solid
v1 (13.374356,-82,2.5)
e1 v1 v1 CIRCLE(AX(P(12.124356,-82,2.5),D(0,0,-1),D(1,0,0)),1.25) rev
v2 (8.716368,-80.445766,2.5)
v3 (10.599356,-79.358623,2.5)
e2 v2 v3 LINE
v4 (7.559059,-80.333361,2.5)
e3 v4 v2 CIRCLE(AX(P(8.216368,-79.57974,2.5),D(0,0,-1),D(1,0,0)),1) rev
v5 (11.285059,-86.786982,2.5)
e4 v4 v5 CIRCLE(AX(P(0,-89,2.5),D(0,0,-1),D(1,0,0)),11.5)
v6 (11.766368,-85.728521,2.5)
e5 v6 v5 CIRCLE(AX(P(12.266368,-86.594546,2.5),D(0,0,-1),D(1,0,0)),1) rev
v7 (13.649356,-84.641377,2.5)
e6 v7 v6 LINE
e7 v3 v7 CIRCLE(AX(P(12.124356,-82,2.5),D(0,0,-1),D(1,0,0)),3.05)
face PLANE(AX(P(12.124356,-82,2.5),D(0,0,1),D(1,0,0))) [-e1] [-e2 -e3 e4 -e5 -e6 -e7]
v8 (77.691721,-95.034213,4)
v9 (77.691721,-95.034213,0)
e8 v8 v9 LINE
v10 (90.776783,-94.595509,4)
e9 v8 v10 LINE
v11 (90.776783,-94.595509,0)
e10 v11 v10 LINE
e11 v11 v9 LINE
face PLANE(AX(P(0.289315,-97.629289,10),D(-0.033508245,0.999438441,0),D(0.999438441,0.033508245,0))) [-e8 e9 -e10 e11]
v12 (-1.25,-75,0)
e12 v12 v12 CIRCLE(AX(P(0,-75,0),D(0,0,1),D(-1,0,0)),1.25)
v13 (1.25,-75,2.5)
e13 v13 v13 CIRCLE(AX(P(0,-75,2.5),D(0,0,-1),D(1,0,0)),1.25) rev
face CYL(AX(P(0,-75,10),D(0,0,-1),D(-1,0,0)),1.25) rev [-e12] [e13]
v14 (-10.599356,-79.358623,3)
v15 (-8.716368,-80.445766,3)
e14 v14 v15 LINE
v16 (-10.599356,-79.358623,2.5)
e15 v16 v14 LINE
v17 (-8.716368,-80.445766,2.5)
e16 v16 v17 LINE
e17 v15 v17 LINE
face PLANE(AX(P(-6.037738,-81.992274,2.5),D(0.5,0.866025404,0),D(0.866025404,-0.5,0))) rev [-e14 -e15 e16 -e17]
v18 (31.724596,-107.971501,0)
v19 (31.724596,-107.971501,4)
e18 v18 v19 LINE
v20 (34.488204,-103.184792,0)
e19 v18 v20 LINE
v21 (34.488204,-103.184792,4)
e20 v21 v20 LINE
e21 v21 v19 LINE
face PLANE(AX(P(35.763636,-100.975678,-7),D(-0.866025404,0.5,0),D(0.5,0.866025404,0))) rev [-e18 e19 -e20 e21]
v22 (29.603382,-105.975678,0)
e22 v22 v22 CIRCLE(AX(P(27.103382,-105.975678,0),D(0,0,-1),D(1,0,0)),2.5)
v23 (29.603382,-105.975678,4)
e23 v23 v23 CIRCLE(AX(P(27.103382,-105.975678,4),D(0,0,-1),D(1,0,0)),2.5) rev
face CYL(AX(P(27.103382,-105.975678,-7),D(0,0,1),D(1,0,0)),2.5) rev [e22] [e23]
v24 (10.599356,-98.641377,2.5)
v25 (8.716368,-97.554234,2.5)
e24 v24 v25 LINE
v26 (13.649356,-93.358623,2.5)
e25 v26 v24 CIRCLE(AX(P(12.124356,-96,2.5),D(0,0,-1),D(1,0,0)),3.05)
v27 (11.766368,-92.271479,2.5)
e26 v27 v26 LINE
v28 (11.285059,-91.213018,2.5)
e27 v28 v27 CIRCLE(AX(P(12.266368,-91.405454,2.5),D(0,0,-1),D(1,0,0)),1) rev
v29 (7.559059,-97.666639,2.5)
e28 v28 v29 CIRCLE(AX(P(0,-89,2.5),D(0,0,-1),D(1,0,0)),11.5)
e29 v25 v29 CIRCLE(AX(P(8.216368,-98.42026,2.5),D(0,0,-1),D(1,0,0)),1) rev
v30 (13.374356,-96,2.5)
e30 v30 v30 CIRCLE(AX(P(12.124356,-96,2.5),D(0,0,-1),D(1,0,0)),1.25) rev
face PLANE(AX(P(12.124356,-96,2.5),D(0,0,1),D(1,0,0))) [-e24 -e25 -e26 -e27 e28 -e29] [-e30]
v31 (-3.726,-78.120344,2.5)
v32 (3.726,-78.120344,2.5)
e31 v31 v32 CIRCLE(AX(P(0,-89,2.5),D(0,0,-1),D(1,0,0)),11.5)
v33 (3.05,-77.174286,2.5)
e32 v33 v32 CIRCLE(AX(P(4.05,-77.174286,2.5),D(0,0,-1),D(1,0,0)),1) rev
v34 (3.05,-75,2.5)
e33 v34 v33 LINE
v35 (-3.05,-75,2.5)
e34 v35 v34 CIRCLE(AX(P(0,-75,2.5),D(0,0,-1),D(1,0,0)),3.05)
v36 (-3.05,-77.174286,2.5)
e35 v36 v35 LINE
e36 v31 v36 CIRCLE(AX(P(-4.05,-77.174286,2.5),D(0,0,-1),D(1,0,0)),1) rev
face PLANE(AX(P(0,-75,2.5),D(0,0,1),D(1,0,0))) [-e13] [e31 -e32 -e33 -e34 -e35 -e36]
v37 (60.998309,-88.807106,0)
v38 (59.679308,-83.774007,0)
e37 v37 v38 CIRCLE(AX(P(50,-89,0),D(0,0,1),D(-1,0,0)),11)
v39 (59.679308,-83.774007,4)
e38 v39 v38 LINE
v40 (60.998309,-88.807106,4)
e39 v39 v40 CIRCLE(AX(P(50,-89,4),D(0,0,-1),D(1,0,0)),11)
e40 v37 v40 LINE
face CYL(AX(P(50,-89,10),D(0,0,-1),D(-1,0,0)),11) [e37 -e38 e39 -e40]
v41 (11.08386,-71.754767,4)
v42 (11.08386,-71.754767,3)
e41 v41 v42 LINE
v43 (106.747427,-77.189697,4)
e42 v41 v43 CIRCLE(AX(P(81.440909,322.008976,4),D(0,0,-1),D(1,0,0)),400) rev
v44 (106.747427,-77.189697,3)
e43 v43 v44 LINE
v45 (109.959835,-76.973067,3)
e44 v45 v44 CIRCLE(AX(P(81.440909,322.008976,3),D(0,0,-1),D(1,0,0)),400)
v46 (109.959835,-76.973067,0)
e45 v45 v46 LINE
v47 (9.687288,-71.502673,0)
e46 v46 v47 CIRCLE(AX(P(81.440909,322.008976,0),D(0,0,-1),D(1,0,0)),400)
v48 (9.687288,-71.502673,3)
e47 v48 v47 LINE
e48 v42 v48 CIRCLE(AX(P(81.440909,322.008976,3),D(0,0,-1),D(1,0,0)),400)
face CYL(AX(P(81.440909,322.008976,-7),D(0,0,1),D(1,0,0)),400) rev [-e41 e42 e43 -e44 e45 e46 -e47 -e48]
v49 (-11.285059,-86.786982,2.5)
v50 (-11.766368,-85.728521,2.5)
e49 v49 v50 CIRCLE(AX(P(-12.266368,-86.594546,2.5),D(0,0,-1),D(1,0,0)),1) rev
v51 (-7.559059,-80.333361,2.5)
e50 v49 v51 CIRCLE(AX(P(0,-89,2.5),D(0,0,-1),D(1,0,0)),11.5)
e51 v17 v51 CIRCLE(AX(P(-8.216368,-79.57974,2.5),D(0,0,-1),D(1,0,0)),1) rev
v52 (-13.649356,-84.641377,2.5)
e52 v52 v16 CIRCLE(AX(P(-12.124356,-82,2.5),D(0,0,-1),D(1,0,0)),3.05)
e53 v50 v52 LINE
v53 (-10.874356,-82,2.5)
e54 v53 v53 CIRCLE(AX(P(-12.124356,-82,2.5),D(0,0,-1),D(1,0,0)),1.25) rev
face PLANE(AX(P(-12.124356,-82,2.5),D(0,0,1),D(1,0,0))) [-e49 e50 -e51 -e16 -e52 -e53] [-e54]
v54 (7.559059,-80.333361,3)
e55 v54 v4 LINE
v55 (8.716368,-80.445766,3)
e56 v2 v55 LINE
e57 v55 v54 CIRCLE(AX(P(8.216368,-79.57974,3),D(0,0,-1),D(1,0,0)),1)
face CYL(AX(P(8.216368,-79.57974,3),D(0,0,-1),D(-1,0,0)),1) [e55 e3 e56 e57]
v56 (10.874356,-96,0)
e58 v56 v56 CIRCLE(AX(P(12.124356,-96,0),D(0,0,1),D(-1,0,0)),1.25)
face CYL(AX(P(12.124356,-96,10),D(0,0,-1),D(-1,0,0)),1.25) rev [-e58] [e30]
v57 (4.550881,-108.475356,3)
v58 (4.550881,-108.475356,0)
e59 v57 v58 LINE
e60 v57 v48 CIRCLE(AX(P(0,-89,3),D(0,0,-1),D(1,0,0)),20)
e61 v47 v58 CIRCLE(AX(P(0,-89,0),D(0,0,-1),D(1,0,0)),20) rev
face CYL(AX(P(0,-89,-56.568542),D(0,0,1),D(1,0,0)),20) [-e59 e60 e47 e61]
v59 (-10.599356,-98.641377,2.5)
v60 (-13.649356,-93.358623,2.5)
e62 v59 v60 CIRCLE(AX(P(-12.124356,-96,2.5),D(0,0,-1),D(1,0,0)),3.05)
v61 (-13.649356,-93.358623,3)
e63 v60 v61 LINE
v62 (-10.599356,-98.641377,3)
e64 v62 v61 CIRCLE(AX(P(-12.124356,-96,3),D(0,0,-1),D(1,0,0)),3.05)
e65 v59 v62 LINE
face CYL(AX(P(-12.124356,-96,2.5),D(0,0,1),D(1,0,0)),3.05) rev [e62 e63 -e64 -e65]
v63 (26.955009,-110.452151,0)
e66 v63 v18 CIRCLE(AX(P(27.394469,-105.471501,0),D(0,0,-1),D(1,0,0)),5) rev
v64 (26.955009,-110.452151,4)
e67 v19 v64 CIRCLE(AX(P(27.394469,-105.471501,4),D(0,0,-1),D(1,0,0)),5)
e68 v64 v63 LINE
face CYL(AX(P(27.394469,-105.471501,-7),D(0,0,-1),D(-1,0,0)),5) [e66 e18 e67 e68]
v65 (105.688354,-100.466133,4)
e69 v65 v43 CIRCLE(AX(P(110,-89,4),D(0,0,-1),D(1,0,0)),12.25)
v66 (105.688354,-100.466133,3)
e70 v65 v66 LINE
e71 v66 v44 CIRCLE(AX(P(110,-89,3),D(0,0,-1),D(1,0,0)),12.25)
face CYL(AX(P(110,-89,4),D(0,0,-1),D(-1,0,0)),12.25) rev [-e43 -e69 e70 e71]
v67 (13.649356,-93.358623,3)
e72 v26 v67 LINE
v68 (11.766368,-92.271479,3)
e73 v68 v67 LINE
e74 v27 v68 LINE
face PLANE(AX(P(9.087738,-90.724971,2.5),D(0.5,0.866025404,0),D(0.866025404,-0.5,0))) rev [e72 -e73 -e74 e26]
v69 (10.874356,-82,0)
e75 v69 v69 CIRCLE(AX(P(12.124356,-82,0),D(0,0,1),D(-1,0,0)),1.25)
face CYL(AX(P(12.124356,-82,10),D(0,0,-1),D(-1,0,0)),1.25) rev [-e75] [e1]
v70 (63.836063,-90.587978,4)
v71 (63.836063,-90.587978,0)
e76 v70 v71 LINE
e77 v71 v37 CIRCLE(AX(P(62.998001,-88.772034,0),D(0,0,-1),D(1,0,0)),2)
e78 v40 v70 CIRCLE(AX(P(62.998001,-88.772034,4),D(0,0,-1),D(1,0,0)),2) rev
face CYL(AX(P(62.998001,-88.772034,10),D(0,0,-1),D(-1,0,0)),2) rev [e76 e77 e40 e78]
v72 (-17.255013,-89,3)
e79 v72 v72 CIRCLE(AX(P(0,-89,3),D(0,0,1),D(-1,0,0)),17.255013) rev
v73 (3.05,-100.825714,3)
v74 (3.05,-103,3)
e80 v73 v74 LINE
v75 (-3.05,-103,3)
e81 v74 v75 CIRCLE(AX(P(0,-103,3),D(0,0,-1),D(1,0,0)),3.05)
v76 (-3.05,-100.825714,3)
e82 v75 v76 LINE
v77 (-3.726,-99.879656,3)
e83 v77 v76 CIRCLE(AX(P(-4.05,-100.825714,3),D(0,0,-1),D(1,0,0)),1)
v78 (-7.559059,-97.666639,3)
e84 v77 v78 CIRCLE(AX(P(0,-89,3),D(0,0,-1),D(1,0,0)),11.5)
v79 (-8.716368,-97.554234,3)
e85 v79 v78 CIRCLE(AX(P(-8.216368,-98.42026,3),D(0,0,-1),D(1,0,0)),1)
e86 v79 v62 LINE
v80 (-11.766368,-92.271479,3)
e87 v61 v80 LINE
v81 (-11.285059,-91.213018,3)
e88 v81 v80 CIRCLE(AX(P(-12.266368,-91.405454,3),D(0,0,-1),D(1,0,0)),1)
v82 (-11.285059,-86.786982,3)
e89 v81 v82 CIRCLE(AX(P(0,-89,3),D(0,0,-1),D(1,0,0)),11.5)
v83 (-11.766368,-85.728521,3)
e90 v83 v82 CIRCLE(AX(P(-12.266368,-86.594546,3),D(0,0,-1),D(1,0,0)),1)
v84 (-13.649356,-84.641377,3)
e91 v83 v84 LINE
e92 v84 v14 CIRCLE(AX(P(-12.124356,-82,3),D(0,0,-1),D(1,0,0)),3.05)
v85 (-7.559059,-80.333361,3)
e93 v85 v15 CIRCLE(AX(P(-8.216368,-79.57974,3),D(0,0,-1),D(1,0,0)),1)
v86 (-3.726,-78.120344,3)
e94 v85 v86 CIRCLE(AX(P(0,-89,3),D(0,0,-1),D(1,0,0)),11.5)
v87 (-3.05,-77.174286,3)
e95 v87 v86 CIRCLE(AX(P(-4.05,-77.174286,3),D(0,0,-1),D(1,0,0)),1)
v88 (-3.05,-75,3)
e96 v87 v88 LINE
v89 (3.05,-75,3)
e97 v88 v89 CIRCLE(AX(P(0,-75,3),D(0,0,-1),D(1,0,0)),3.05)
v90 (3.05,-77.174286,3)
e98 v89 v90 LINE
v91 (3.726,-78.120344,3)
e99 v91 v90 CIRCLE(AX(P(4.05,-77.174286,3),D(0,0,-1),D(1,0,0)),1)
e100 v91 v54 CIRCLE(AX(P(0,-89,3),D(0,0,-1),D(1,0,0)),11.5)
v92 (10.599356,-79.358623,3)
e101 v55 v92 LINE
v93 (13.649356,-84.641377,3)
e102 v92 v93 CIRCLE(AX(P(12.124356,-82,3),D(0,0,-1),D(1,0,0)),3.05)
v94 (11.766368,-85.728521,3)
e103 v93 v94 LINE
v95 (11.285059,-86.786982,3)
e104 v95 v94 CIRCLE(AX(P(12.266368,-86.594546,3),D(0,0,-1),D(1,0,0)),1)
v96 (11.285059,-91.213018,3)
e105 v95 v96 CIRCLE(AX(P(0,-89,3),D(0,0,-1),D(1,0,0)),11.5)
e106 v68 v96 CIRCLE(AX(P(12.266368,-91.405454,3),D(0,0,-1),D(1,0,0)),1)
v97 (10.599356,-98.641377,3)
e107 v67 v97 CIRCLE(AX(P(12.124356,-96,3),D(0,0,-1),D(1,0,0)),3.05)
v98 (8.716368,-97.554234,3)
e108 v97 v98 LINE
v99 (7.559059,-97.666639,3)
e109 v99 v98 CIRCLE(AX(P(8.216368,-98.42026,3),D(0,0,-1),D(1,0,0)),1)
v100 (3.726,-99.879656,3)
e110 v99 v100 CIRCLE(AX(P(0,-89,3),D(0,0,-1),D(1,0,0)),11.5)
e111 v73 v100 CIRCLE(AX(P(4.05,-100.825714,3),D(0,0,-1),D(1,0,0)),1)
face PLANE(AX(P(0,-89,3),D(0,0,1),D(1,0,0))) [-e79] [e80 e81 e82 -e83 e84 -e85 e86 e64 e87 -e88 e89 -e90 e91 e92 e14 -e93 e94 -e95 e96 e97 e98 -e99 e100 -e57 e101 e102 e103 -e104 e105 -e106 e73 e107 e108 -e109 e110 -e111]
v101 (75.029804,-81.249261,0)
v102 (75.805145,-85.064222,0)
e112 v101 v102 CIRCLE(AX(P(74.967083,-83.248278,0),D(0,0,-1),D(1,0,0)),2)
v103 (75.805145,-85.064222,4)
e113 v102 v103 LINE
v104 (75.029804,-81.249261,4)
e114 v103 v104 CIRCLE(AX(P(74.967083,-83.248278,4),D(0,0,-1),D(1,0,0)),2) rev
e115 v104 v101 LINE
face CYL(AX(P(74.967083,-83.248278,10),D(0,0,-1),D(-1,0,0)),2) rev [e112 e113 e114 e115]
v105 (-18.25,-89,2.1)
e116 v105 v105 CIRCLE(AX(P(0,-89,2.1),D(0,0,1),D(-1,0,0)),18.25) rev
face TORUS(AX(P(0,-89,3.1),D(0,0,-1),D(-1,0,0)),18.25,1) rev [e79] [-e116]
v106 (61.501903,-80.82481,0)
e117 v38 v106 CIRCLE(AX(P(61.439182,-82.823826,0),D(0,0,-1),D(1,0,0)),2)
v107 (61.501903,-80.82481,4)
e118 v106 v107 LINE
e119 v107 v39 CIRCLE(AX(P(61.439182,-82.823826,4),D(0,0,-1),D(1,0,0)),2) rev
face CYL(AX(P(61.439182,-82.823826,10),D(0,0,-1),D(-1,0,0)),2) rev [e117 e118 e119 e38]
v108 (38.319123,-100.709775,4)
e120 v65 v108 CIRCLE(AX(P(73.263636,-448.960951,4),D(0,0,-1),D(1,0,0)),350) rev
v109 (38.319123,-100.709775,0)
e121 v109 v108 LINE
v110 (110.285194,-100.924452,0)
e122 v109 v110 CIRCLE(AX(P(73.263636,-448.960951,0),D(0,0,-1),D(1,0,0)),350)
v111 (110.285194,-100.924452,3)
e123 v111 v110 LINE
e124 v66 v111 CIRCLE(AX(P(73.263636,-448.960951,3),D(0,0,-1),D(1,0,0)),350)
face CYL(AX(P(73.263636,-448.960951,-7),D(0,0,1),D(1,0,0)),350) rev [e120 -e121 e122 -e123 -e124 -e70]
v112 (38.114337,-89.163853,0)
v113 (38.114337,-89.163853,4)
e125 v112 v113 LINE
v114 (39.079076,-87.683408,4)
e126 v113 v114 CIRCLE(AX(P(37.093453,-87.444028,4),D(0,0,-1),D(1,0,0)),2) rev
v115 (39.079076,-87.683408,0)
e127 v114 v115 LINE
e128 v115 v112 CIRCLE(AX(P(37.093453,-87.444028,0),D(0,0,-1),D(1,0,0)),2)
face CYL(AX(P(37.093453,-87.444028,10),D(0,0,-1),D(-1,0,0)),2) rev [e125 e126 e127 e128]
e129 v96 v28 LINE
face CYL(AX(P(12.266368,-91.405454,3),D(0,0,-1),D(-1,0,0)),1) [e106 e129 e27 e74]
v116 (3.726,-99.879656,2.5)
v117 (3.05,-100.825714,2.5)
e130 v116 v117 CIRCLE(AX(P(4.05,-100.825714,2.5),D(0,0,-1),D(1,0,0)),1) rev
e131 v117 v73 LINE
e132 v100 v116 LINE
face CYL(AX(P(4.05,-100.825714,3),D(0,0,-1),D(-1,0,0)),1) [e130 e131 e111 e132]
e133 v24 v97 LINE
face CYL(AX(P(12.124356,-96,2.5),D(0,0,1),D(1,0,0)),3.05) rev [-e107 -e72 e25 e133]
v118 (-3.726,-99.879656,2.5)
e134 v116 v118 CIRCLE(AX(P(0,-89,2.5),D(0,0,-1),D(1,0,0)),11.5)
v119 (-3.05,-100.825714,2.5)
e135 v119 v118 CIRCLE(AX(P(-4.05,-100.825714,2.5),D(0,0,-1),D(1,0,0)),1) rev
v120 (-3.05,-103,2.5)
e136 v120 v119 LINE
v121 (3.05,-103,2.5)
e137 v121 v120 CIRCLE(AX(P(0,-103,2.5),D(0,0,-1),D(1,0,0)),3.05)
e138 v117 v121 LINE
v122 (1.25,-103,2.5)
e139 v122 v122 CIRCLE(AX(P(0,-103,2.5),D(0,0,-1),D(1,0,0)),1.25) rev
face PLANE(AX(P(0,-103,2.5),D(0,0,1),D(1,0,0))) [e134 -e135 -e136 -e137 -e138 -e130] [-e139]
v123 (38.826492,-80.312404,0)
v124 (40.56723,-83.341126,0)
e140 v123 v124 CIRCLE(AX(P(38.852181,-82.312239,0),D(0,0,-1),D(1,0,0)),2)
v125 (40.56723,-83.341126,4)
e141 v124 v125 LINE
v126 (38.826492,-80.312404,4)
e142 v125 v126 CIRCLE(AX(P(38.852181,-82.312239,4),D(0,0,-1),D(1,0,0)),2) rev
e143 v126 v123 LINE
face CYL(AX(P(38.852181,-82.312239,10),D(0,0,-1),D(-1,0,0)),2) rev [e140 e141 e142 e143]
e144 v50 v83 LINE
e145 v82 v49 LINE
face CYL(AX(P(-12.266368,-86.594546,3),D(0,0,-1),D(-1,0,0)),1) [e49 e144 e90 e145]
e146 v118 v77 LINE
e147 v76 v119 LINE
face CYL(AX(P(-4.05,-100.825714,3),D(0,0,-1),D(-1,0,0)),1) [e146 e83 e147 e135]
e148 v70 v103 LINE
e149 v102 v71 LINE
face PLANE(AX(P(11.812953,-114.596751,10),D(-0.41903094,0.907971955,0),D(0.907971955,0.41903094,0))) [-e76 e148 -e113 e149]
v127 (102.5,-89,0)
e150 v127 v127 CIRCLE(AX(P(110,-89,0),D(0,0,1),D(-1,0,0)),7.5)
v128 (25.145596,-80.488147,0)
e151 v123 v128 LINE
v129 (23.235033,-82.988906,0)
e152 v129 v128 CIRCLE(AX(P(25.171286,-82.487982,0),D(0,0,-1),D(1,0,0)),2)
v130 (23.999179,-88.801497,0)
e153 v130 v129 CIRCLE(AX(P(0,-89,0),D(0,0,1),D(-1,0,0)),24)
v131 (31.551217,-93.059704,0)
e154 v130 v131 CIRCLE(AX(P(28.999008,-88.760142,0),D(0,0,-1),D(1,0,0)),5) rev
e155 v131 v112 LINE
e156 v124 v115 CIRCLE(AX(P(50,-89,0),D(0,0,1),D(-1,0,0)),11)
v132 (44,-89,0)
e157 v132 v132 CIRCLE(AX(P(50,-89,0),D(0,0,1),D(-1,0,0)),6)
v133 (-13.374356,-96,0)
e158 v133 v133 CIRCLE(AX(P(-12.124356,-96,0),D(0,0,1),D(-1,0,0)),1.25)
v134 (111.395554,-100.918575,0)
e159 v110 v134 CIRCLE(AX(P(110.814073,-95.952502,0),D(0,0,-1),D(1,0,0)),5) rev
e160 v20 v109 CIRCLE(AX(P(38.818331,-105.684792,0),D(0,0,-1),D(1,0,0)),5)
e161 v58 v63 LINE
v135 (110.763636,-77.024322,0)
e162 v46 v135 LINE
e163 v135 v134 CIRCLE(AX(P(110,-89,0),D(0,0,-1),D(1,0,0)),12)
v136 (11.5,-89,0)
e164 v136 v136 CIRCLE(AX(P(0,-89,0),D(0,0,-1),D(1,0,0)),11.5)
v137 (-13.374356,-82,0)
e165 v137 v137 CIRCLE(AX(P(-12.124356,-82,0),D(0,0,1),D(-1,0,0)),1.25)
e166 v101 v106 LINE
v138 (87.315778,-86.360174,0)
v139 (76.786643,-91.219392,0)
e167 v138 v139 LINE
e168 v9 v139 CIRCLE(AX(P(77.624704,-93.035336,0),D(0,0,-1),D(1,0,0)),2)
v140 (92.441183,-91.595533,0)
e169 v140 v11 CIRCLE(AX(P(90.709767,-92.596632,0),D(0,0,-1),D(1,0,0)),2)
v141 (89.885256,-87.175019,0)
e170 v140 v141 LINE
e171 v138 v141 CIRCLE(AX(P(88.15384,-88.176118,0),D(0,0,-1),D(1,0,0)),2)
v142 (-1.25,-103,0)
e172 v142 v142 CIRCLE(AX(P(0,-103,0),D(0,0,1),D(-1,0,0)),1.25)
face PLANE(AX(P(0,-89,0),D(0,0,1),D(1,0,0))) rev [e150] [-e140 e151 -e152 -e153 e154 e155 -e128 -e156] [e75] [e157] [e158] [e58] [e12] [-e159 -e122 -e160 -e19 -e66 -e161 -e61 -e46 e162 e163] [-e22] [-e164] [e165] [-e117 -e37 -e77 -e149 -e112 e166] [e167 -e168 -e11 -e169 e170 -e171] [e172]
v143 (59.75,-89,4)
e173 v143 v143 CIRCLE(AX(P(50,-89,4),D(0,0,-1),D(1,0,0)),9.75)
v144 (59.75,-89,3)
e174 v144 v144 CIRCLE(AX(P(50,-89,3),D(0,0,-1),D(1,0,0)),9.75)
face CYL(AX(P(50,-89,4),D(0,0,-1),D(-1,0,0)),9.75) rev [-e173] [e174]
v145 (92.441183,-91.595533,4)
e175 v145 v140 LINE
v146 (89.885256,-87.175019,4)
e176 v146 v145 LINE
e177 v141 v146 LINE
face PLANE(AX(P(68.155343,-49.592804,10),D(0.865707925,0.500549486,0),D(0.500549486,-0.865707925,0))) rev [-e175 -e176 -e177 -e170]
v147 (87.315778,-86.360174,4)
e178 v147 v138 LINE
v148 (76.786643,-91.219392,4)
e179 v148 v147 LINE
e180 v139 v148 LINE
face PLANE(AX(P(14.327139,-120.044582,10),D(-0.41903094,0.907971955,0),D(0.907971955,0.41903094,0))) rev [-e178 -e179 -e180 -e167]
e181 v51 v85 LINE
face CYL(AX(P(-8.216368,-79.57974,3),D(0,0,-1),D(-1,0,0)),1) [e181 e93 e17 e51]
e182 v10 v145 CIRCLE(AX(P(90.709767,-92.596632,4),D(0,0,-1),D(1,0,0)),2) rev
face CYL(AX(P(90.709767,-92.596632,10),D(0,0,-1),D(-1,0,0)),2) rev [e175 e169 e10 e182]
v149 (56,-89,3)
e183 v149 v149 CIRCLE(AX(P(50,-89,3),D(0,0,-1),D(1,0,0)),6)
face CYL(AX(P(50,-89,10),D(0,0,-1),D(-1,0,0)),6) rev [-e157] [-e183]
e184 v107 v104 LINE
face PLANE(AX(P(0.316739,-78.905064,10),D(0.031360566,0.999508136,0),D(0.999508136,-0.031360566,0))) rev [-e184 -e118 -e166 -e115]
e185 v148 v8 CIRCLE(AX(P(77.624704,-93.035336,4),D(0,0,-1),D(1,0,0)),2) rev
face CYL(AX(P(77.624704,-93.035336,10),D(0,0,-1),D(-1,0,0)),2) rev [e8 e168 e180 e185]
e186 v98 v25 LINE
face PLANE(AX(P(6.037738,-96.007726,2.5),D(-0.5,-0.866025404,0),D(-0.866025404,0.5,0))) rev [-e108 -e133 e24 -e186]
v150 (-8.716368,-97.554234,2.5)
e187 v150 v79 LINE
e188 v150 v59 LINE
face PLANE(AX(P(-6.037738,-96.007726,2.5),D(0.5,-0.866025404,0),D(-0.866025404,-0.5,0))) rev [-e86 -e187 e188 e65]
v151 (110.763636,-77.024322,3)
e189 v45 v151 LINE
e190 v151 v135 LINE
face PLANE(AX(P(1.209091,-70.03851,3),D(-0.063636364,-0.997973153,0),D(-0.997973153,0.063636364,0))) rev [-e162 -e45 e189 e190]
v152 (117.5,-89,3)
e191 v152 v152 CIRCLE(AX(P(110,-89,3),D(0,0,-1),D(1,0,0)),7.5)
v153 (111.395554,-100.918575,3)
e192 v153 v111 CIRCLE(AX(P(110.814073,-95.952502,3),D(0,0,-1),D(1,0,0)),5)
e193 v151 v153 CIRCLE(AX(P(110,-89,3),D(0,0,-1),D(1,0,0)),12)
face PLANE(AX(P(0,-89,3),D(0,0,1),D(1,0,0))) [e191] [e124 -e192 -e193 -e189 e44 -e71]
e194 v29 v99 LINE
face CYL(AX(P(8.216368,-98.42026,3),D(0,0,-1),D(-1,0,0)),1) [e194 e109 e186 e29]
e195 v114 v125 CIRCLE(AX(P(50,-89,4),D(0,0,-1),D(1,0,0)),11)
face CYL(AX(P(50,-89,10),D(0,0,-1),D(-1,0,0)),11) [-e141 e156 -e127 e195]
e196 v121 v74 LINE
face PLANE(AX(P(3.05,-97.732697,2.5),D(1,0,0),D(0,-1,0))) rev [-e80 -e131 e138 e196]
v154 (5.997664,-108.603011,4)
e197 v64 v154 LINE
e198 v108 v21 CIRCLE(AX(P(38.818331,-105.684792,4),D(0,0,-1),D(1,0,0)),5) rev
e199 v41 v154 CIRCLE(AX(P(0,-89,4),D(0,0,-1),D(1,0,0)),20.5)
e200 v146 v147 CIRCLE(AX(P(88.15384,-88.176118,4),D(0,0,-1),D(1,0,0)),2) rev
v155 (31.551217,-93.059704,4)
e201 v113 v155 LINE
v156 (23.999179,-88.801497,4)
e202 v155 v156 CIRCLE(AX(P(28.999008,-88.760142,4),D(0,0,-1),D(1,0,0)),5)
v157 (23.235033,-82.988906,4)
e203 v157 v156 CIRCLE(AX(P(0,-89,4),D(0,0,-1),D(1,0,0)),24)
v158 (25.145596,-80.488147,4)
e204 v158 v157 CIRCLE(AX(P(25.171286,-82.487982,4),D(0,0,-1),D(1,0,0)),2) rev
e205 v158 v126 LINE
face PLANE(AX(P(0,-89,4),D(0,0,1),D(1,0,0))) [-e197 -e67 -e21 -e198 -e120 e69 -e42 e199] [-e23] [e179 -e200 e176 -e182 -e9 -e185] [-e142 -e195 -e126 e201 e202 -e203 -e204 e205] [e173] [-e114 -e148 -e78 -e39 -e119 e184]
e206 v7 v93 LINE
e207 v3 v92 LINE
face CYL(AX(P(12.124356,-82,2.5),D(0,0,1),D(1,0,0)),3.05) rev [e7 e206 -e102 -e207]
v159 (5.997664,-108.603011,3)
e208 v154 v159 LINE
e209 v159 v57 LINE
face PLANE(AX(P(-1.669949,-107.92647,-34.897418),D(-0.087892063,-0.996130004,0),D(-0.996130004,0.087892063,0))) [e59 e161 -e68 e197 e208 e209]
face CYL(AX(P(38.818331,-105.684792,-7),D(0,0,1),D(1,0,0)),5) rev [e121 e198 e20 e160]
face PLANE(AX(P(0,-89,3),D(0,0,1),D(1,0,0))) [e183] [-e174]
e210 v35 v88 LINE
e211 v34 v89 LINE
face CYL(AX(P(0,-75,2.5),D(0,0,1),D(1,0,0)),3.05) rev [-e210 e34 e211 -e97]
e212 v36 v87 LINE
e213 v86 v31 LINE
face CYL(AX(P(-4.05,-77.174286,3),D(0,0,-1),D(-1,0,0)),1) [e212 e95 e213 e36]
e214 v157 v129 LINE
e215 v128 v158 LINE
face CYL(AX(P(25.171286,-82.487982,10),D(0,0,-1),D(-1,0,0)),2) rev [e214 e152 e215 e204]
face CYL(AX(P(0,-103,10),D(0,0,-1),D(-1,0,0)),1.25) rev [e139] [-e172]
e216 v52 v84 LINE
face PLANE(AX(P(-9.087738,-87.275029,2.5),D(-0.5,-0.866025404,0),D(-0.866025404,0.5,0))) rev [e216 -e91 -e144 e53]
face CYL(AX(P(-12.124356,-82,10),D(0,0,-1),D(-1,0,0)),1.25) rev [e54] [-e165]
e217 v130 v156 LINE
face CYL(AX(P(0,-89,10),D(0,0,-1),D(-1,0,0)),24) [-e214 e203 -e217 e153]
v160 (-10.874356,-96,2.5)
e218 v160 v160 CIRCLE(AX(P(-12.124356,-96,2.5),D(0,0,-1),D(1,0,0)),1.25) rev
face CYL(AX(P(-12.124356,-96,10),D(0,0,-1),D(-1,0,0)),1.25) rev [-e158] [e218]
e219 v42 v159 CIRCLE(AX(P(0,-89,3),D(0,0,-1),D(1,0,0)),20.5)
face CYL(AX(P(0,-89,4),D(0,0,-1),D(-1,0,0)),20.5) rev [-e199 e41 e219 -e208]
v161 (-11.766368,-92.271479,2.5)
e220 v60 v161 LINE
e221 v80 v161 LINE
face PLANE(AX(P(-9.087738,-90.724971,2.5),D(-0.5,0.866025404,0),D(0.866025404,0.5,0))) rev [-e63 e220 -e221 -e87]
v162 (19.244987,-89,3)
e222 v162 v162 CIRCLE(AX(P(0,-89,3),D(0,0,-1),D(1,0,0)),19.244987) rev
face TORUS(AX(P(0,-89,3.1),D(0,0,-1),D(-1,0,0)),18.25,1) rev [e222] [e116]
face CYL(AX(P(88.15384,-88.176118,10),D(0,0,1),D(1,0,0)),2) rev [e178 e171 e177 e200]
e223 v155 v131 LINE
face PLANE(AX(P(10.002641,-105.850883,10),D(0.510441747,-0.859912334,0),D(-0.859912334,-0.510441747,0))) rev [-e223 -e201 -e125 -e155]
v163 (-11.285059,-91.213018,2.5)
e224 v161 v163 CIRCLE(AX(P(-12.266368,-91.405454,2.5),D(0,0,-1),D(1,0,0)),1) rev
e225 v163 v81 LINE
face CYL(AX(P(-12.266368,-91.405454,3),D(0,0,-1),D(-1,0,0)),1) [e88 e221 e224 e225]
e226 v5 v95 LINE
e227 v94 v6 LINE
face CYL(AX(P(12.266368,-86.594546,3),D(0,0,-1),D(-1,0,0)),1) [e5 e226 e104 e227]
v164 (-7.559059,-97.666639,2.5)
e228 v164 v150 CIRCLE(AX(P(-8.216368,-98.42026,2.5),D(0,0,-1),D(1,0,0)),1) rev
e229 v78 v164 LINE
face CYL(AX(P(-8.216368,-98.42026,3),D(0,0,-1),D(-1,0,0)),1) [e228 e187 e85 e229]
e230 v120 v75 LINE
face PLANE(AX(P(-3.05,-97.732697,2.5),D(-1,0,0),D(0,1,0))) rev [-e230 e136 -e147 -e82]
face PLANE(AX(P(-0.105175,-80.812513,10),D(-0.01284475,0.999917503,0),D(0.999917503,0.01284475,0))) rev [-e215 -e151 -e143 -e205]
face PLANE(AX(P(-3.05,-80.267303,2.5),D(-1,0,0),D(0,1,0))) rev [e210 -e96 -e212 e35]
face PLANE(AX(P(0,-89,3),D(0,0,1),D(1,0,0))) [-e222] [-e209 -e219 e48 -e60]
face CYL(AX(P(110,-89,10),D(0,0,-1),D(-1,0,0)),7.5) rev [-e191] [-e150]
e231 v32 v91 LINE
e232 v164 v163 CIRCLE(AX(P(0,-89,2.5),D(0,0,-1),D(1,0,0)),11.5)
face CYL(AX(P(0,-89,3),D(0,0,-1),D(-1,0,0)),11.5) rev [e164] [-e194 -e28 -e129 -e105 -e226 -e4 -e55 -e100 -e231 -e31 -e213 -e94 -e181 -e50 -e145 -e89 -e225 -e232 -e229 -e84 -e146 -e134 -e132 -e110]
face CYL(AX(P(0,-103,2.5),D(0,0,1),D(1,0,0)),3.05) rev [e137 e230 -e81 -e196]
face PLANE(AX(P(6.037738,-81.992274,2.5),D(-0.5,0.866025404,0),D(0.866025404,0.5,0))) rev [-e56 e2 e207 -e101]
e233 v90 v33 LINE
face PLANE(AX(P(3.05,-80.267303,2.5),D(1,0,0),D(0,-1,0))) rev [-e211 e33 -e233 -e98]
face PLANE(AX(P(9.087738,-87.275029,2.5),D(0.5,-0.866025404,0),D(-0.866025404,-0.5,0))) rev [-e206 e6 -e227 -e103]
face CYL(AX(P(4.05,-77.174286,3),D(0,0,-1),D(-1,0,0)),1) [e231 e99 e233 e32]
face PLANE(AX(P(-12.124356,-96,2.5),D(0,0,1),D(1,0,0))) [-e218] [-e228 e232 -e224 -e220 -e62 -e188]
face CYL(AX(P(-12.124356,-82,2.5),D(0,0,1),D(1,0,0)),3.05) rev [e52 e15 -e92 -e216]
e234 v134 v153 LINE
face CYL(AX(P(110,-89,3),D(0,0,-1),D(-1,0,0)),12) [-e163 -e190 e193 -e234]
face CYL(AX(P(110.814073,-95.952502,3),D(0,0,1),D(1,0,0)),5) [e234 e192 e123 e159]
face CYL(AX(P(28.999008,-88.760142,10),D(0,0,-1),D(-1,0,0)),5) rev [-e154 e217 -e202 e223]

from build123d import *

# Parameters (mm, degrees)
SKETCH_1_R           = 11.5
EXTRUDE_1_DEPTH      = 3
SKETCH_2_R           = 6
CUT_EXTRUDE_1_DEPTH  = 10
SKETCH_3_R           = 7.5
CUT_EXTRUDE_2_DEPTH  = 10
SKETCH_5_R           = 1.25
CUT_EXTRUDE_4_DEPTH  = 10
SKETCH_9_W           = 9.785413343
SKETCH_9_H           = 10.582240284
EXTRUDE_4_DEPTH      = 3
EXTRUDE_6_DEPTH      = 3
SKETCH_13_R          = 400
CUT_EXTRUDE_6_DEPTH  = 10
EXTRUDE_7_DEPTH      = 3
SKETCH_15_R          = 2.5
CUT_EXTRUDE_7_DEPTH  = 10
EXTRUDE_START        = 1
SKETCH_19_R          = 9.75
SKETCH_19_R_2        = 2.5
EXTRUDE_8_DEPTH      = 1
FILLET_1_R           = 5
CUT_EXTRUDE_8_DEPTH  = 10
FILLET_2_R           = 2
FILLET_3_DEPTH       = 4
CUT_EXTRUDE_9_DEPTH  = 0.5
FILLET_5_R           = 1
SKETCH_21_R          = 20
SKETCH_21_R_2        = 17.05
EXTRUDE_9_DEPTH      = 3
EXTRUDE_START_2      = 0.1
SKETCH_23_R          = 20
SKETCH_23_R_2        = 17.05
EXTRUDE_10_DEPTH     = 0.1
SKETCH_22_R          = 19.25
SKETCH_22_R_2        = 17.25
CUT_EXTRUDE_14_DEPTH = 1
FILLET_7_R           = 1
SKETCH_24_R          = 20
CUT_EXTRUDE_15_DEPTH = 0.1


with BuildPart() as part:
    # 草图1 → 凸台-拉伸1 (new body)
    with BuildSketch(Plane.XY):
        with BuildLine():
            Line((1.209090909, 18.961489899), (110.763636364, 11.975677831))
            ThreePointArc((110.763636364, 11.975677831), (122, 0), (110.763636364, -11.975677831))
            Line((110.763636364, -11.975677831), (1.209090909, -18.961489899))
            ThreePointArc((1.209090909, -18.961489899), (-19, 0), (1.209090909, 18.961489899))
        make_face()
        Circle(SKETCH_1_R, mode=Mode.SUBTRACT)
    extrude(amount=EXTRUDE_1_DEPTH)

    # 草图2 → 切除-拉伸1 (cut)
    with BuildSketch(Plane(origin=(0, 0, 0), x_dir=(-1, 0, 0), z_dir=(0, 0, -1))):
        with Locations((-50, 0)):
            Circle(SKETCH_2_R)
    extrude(amount=-CUT_EXTRUDE_1_DEPTH, mode=Mode.SUBTRACT)

    # 草图3 → 切除-拉伸2 (cut)
    with BuildSketch(Plane(origin=(0, 0, 0), x_dir=(-1, 0, 0), z_dir=(0, 0, -1))):
        with Locations((-110, 0)):
            Circle(SKETCH_3_R)
    extrude(amount=-CUT_EXTRUDE_2_DEPTH, mode=Mode.SUBTRACT)

    # 草图5 → 切除-拉伸4 (cut)
    with BuildSketch(Plane(origin=(0, 0, 0), x_dir=(-1, 0, 0), z_dir=(0, 0, -1))):
        with Locations((0, 14)):
            Circle(SKETCH_5_R)
        with Locations((12.124355653, 7)):
            Circle(SKETCH_5_R)
        with Locations((12.124355653, -7)):
            Circle(SKETCH_5_R)
        with Locations((0, -14)):
            Circle(SKETCH_5_R)
        with Locations((-12.124355653, -7)):
            Circle(SKETCH_5_R)
        with Locations((-12.124355653, 7)):
            Circle(SKETCH_5_R)
    extrude(amount=-CUT_EXTRUDE_4_DEPTH, mode=Mode.SUBTRACT)

    # 草图9 → 凸台-拉伸4 (add, through all)
    with BuildSketch(Plane.XY.offset(3)):
        with Locations((26.618118247, 0)):
            Rectangle(SKETCH_9_W, SKETCH_9_H)
    extrude(amount=-EXTRUDE_4_DEPTH)

    # 草图12 → 凸台-拉伸6 (add)
    with BuildSketch(Plane.XY.offset(3)):
        Polygon((28.745410775, -6.403803536), (34.060824307, -16.874768539), (25.628100583, -16.874768539), (24.509066155, -9.241355121), align=None)
    extrude(amount=-EXTRUDE_6_DEPTH)

    # 草图13 → 切除-拉伸6 (cut)
    with BuildSketch(Plane.XY.offset(3)):
        with Locations((81.440909091, -411.008975968)):
            Circle(SKETCH_13_R)
        with BuildLine():
            Line((35.763636364, 11.975677831), (32.896967938, 16.940893192))
            Line((32.896967938, 16.940893192), (110.763636364, 11.975677831))
            ThreePointArc((110.763636364, 11.975677831), (73.263636364, 9.960950508), (35.763636364, 11.975677831))
        make_face()
    extrude(amount=-CUT_EXTRUDE_6_DEPTH, mode=Mode.SUBTRACT)

    # 草图16 → 凸台-拉伸7 (add)
    with BuildSketch(Plane.XY.offset(3)):
        Polygon((32.896967938, 16.940893192), (30.130621057, 21.732346541), (-1.669949201, 18.926470079), align=None)
    extrude(amount=-EXTRUDE_7_DEPTH)

    # 草图15 → 切除-拉伸7 (cut)
    with BuildSketch(Plane.XY.offset(3)):
        with Locations((27.103382326, 16.975677831)):
            Circle(SKETCH_15_R)
    extrude(amount=-CUT_EXTRUDE_7_DEPTH, mode=Mode.SUBTRACT)

    # 草图19 → 凸台-拉伸8 (add)
    with BuildSketch(Plane.XY.offset(3).offset(EXTRUDE_START)):
        with BuildLine():
            ThreePointArc((105.688354296, 11.466133233), (70.713238171, 9.970242818), (35.763636364, 11.975677831))
            Line((35.763636364, 11.975677831), (30.130621057, 21.732346541))
            Line((30.130621057, 21.732346541), (5.997664044, 19.603010637))
            ThreePointArc((5.997664044, 19.603010637), (20.307458553, 2.803056747), (11.083860146, -17.245232508))
            ThreePointArc((11.083860146, -17.245232508), (58.752317078, -11.652959621), (106.747426676, -11.810303416))
            ThreePointArc((106.747426676, -11.810303416), (97.762660496, -0.556796062), (105.688354296, 11.466133233))
        make_face()
        with Locations((50, 0)):
            Circle(SKETCH_19_R, mode=Mode.SUBTRACT)
        with Locations((27.103382326, 16.975677831)):
            Circle(SKETCH_19_R_2, mode=Mode.SUBTRACT)
    extrude(amount=-EXTRUDE_8_DEPTH)

    # 圆角1
    fillet_1_edges = [part.edges().sort_by_distance(p)[0] for p in [
        (35.763636364, 11.975677831, 2),
        (30.130621057, 21.732346541, 2),
        (110.763636364, 11.975677831, 1.5),
    ]]
    fillet(fillet_1_edges, radius=FILLET_1_R)

    # 草图4 → 切除-拉伸8 (cut)
    with BuildSketch(Plane(origin=(0, 0, 0), x_dir=(-1, 0, 0), z_dir=(0, 0, -1))):
        with BuildLine():
            Line((-22.718337944, 7.738030826), (-25.489112126, 7.658153323))
            Line((-25.489112126, 7.658153323), (-39.006073297, -0.365480019))
            ThreePointArc((-39.006073297, -0.365480019), (-40.223576833, -5.041978785), (-43.327845655, -8.745419166))
            Line((-43.327845655, -8.745419166), (-22.452972771, -8.477264519))
            ThreePointArc((-22.452972771, -8.477264519), (-23.996786842, -0.392710175), (-22.718337944, 7.738030826))
        make_face()
        with BuildLine():
            Line((-83.49595781, -7.485104525), (-57.207283211, -8.309937949))
            ThreePointArc((-57.207283211, -8.309937949), (-60.555711126, -3.094666805), (-60.553265828, 3.102995386))
            Line((-60.553265828, 3.102995386), (-83.49595781, -7.485104525))
        make_face()
        Polygon((-88.972134801, -3.404237943), (-67.80208643, 6.365783266), (-94.111121995, 5.483718321), align=None)
    extrude(amount=-CUT_EXTRUDE_8_DEPTH, mode=Mode.SUBTRACT)

    # 圆角2
    # the kernel refuses this fillet: 2 mm, written as the material it adds along each edge
    with BuildSketch(Plane(origin=(22.718337944, 7.738030826, 0), x_dir=(0.9995847151360328, -0.028816614416278277, 0), z_dir=(0, 0, 1))) as fillet_2_piece_1:
        with BuildLine():
            CenterArc((2.716749156, -2), FILLET_2_R, 90, 104.226121897)
            ThreePointArc((0.778082336, -2.491498686), (0.422937237, -1.235163774), (0, 0))
            Line((0, 0), (2.716749156, 0))
        make_face()
    extrude(amount=4)
    with BuildSketch(Plane(origin=(25.489112126, 7.658153323, 0), x_dir=(-0.9995847151360342, 0.028816614416228722, 0), z_dir=(0, 0, 1))) as fillet_2_piece_2:
        with BuildLine():
            CenterArc((FILLET_2_R * 0.259008280186, FILLET_2_R), FILLET_2_R, 240.958040197, 29.041959803)
            Line((-FILLET_2_R * 0.226441726119, FILLET_2_R * 0.12573557125), (0, 0))
            Line((0, 0), (FILLET_2_R * 0.259008280186, 0))
        make_face()
    extrude(amount=4)
    with BuildSketch(Plane(origin=(57.207283211, -8.309937949, 0), x_dir=(0.9995081364804766, 0.031360566151216684, 0), z_dir=(0, 0, 1))) as fillet_2_piece_3:
        with BuildLine():
            CenterArc((4.296733051, 2), FILLET_2_R, 149.837648672, 120.162351328)
            ThreePointArc((2.567522758, 3.004903858), (1.419830152, 1.386188751), (0, 0))
            Line((0, 0), (4.296733051, 0))
        make_face()
    extrude(amount=4)
    with BuildSketch(Plane(origin=(60.553265828, 3.102995386, 0), x_dir=(0.907971955307365, -0.4190309396396886, 0), z_dir=(0, 0, 1))) as fillet_2_piece_4:
        with BuildLine():
            CenterArc((3.615526985, -2), FILLET_2_R, 90, 113.768639436)
            ThreePointArc((1.785166166, -2.806088874), (0.999247071, -1.335187377), (0, 0))
            Line((0, 0), (3.615526985, 0))
        make_face()
    extrude(amount=4)
    with BuildSketch(Plane(origin=(83.49595781, -7.485104525, 0), x_dir=(-0.9079719553073375, 0.41903093963974836, 0), z_dir=(0, 0, 1))) as fillet_2_piece_5:
        with BuildLine():
            CenterArc((FILLET_2_R * 4.23516000471, FILLET_2_R), FILLET_2_R, 116.570544508, 153.429455492)
            Line((FILLET_2_R * 3.78786065654, FILLET_2_R * 1.89438430952), (0, 0))
            Line((0, 0), (FILLET_2_R * 4.23516000471, 0))
        make_face()
    extrude(amount=4)
    with BuildSketch(Plane(origin=(88.972134801, -3.404237943, 0), x_dir=(-0.9079719553073382, 0.41903093963974675, 0), z_dir=(0, 0, 1))) as fillet_2_piece_6:
        with BuildLine():
            CenterArc((FILLET_2_R * 0.912118784285, -FILLET_2_R), FILLET_2_R, 90, 84.737061388)
            Line((-FILLET_2_R * 0.0836654548784, -FILLET_2_R * 0.908273509635), (0, 0))
            Line((0, 0), (FILLET_2_R * 0.912118784285, 0))
        make_face()
    extrude(amount=4)
    with BuildSketch(Plane(origin=(94.111121995, 5.483718321, 0), x_dir=(-0.9994384410783521, 0.03350824517747174, 0), z_dir=(0, 0, 1))) as fillet_2_piece_7:
        with BuildLine():
            CenterArc((FILLET_2_R * 1.66810604239, FILLET_2_R), FILLET_2_R, 151.883880104, 118.116119896)
            Line((FILLET_2_R * 0.786111728241, FILLET_2_R * 1.47126004478), (0, 0))
            Line((0, 0), (FILLET_2_R * 1.66810604239, 0))
        make_face()
    extrude(amount=4)
    with BuildSketch(Plane(origin=(67.80208643, 6.365783266, 0), x_dir=(0.9079719553073374, -0.41903093963974836, 0), z_dir=(0, 0, 1))) as fillet_2_piece_8:
        with BuildLine():
            CenterArc((FILLET_2_R * 4.94759562481, FILLET_2_R), FILLET_2_R, 112.853181284, 157.146818716)
            Line((FILLET_2_R * 4.55922454262, FILLET_2_R * 1.92150306702), (0, 0))
            Line((0, 0), (FILLET_2_R * 4.94759562481, 0))
        make_face()
    extrude(amount=4)
    with BuildSketch(Plane(origin=(39.006073297, -0.365480019, 0), x_dir=(-0.8599123343159623, 0.5104417472065474, 0), z_dir=(0, 0, 1))) as fillet_2_piece_9:
        with BuildLine():
            CenterArc((1.037008755, 2), FILLET_2_R, 217.567480166, 52.432519834)
            ThreePointArc((-0.548262886, 0.780609241), (-0.265665753, 0.39625052), (0, 0))
            Line((0, 0), (1.037008755, 0))
        make_face()
    extrude(amount=4)
    with BuildSketch(Plane(origin=(22.452972771, -8.477264519, 0), x_dir=(0.9999175027948216, -0.01284475007806766, 0), z_dir=(0, 0, 1))) as fillet_2_piece_10:
        with BuildLine():
            CenterArc((2.692845423, 2), FILLET_2_R, 166.231102907, 103.768897093)
            ThreePointArc((0.750318174, 2.476012488), (0.408547652, 1.227888344), (0, 0))
            Line((0, 0), (2.692845423, 0))
        make_face()
    extrude(amount=4)
    with BuildSketch(Plane(origin=(43.327845655, -8.745419166, 0), x_dir=(-0.6666566833763927, 0.7453649217058637, 0), z_dir=(0, 0, 1))) as fillet_2_piece_11:
        with BuildLine():
            CenterArc((4.517437931, 1.964251261), FILLET_2_R, 137.454482312, 121.696210167)
            Line((3.043957146, 3.316602686), (0, 0))
            ThreePointArc((0, 0), (2.070492385, 0.196618063), (4.14098477, 0))
        make_face()
    extrude(amount=4)

    # 圆角3: read off the stored shape, not the designer's step
    # 圆角3 outline → 圆角3 (add)
    with BuildSketch(Plane.XY):
        with BuildLine():
            ThreePointArc((23.424300597, 5.225145123), (23.866306721, 2.529704233), (23.999179079, -0.198503227))
            ThreePointArc((23.999179079, -0.198503227), (26.543240849, 4.115507296), (31.55121679, 4.059703606))
            Line((31.55121679, 4.059703606), (25.934560956, 7.393736045))
            ThreePointArc((25.934560956, 7.393736045), (25.581112537, 7.559257609), (25.202247662, 7.652983694))
            ThreePointArc((25.202247662, 7.652983694), (23.762733827, 6.842234342), (23.424300597, 5.225145123))
        make_face()
    extrude(amount=FILLET_3_DEPTH)

    # 草图20 → 切除-拉伸9 (cut)
    with BuildSketch(Plane.XY.offset(3)):
        with BuildLine():
            Line((9.0877376, 1.724971107), (13.649355653, 4.358622518))
            ThreePointArc((13.649355653, 4.358622518), (14.765733135, 8.525), (10.599355653, 9.641377482))
            Line((10.599355653, 9.641377482), (6.0377376, 7.00772607))
            ThreePointArc((6.0377376, 7.00772607), (8.010734985, 4.625), (9.0877376, 1.724971107))
        make_face()
        with BuildLine():
            Line((6.0377376, -7.00772607), (10.599355653, -9.641377482))
            ThreePointArc((10.599355653, -9.641377482), (14.765733135, -8.525), (13.649355653, -4.358622518))
            Line((13.649355653, -4.358622518), (9.0877376, -1.724971107))
            ThreePointArc((9.0877376, -1.724971107), (8.010734985, -4.625), (6.0377376, -7.00772607))
        make_face()
        with BuildLine():
            Line((-3.05, -8.732697178), (-3.05, -14))
            ThreePointArc((-3.05, -14), (0, -17.05), (3.05, -14))
            Line((3.05, -14), (3.05, -8.732697178))
            ThreePointArc((3.05, -8.732697178), (0, -9.25), (-3.05, -8.732697178))
        make_face()
        with BuildLine():
            Line((-9.0877376, -1.724971107), (-13.649355653, -4.358622518))
            ThreePointArc((-13.649355653, -4.358622518), (-14.765733135, -8.525), (-10.599355653, -9.641377482))
            Line((-10.599355653, -9.641377482), (-6.0377376, -7.00772607))
            ThreePointArc((-6.0377376, -7.00772607), (-8.010734985, -4.625), (-9.0877376, -1.724971107))
        make_face()
        with BuildLine():
            Line((-6.0377376, 7.00772607), (-10.599355653, 9.641377482))
            ThreePointArc((-10.599355653, 9.641377482), (-14.765733135, 8.525), (-13.649355653, 4.358622518))
            Line((-13.649355653, 4.358622518), (-9.0877376, 1.724971107))
            ThreePointArc((-9.0877376, 1.724971107), (-8.010734985, 4.625), (-6.0377376, 7.00772607))
        make_face()
        with BuildLine():
            Line((3.05, 8.732697178), (3.05, 14))
            ThreePointArc((3.05, 14), (0, 17.05), (-3.05, 14))
            Line((-3.05, 14), (-3.05, 8.732697178))
            ThreePointArc((-3.05, 8.732697178), (0, 9.25), (3.05, 8.732697178))
        make_face()
    extrude(amount=-CUT_EXTRUDE_9_DEPTH, mode=Mode.SUBTRACT)

    # 圆角5
    fillet_5_edges = [part.edges().sort_by_distance(p)[0] for p in [
        (8.077636357, 8.185462167, 2.75),
        (11.127636357, 2.902707204, 2.75),
        (-3.05, 11.088169371, 2.75),
        (3.05, 11.088169371, 2.75),
        (-11.127636357, 2.902707204, 2.75),
        (-8.077636357, 8.185462167, 2.75),
        (-8.077636357, -8.185462167, 2.75),
        (-11.127636357, -2.902707204, 2.75),
        (3.05, -11.088169371, 2.75),
        (-3.05, -11.088169371, 2.75),
        (11.127636357, -2.902707204, 2.75),
        (8.077636357, -8.185462167, 2.75),
    ]]
    fillet(fillet_5_edges, radius=FILLET_5_R)

    # 草图21 → 凸台-拉伸9 (add)
    with BuildSketch(Plane.XY.offset(3)):
        Circle(SKETCH_21_R)
        Circle(SKETCH_21_R_2, mode=Mode.SUBTRACT)
    extrude(amount=-EXTRUDE_9_DEPTH)

    # 草图23 → 凸台-拉伸10 (add)
    with BuildSketch(Plane.XY.offset(3).offset(EXTRUDE_START_2)):
        Circle(SKETCH_23_R)
        with Locations(Location((0, 0, 0), (0, 0, 150))):
            Circle(SKETCH_23_R_2, mode=Mode.SUBTRACT)
    extrude(amount=-EXTRUDE_10_DEPTH)

    # 草图22 → 切除-拉伸14 (cut)
    with BuildSketch(Plane(origin=(0, 0, 3.1), x_dir=(-1, 0, 0), z_dir=(0, 0, -1))):
        Circle(SKETCH_22_R)
        Circle(SKETCH_22_R_2, mode=Mode.SUBTRACT)
    extrude(amount=CUT_EXTRUDE_14_DEPTH, mode=Mode.SUBTRACT)

    # 圆角7
    fillet_7_edges = [part.edges().sort_by_distance(p)[0] for p in [
        (19.25, 0, 2.1),
        (17.25, 0, 2.1),
    ]]
    fillet(fillet_7_edges, radius=FILLET_7_R - 0.0001)  # a hair under: the kernel refuses the full size

    # 草图24 → 切除-拉伸15 (cut)
    with BuildSketch(Plane.XY.offset(3.1)):
        Circle(SKETCH_24_R)
    extrude(amount=-CUT_EXTRUDE_15_DEPTH, mode=Mode.SUBTRACT)


with BuildPart() as body_2:
    # 镜向4: mirrored copy
    add(part.part.mirror(Plane.ZX.offset(-44.5)))


solid = body_2.part
